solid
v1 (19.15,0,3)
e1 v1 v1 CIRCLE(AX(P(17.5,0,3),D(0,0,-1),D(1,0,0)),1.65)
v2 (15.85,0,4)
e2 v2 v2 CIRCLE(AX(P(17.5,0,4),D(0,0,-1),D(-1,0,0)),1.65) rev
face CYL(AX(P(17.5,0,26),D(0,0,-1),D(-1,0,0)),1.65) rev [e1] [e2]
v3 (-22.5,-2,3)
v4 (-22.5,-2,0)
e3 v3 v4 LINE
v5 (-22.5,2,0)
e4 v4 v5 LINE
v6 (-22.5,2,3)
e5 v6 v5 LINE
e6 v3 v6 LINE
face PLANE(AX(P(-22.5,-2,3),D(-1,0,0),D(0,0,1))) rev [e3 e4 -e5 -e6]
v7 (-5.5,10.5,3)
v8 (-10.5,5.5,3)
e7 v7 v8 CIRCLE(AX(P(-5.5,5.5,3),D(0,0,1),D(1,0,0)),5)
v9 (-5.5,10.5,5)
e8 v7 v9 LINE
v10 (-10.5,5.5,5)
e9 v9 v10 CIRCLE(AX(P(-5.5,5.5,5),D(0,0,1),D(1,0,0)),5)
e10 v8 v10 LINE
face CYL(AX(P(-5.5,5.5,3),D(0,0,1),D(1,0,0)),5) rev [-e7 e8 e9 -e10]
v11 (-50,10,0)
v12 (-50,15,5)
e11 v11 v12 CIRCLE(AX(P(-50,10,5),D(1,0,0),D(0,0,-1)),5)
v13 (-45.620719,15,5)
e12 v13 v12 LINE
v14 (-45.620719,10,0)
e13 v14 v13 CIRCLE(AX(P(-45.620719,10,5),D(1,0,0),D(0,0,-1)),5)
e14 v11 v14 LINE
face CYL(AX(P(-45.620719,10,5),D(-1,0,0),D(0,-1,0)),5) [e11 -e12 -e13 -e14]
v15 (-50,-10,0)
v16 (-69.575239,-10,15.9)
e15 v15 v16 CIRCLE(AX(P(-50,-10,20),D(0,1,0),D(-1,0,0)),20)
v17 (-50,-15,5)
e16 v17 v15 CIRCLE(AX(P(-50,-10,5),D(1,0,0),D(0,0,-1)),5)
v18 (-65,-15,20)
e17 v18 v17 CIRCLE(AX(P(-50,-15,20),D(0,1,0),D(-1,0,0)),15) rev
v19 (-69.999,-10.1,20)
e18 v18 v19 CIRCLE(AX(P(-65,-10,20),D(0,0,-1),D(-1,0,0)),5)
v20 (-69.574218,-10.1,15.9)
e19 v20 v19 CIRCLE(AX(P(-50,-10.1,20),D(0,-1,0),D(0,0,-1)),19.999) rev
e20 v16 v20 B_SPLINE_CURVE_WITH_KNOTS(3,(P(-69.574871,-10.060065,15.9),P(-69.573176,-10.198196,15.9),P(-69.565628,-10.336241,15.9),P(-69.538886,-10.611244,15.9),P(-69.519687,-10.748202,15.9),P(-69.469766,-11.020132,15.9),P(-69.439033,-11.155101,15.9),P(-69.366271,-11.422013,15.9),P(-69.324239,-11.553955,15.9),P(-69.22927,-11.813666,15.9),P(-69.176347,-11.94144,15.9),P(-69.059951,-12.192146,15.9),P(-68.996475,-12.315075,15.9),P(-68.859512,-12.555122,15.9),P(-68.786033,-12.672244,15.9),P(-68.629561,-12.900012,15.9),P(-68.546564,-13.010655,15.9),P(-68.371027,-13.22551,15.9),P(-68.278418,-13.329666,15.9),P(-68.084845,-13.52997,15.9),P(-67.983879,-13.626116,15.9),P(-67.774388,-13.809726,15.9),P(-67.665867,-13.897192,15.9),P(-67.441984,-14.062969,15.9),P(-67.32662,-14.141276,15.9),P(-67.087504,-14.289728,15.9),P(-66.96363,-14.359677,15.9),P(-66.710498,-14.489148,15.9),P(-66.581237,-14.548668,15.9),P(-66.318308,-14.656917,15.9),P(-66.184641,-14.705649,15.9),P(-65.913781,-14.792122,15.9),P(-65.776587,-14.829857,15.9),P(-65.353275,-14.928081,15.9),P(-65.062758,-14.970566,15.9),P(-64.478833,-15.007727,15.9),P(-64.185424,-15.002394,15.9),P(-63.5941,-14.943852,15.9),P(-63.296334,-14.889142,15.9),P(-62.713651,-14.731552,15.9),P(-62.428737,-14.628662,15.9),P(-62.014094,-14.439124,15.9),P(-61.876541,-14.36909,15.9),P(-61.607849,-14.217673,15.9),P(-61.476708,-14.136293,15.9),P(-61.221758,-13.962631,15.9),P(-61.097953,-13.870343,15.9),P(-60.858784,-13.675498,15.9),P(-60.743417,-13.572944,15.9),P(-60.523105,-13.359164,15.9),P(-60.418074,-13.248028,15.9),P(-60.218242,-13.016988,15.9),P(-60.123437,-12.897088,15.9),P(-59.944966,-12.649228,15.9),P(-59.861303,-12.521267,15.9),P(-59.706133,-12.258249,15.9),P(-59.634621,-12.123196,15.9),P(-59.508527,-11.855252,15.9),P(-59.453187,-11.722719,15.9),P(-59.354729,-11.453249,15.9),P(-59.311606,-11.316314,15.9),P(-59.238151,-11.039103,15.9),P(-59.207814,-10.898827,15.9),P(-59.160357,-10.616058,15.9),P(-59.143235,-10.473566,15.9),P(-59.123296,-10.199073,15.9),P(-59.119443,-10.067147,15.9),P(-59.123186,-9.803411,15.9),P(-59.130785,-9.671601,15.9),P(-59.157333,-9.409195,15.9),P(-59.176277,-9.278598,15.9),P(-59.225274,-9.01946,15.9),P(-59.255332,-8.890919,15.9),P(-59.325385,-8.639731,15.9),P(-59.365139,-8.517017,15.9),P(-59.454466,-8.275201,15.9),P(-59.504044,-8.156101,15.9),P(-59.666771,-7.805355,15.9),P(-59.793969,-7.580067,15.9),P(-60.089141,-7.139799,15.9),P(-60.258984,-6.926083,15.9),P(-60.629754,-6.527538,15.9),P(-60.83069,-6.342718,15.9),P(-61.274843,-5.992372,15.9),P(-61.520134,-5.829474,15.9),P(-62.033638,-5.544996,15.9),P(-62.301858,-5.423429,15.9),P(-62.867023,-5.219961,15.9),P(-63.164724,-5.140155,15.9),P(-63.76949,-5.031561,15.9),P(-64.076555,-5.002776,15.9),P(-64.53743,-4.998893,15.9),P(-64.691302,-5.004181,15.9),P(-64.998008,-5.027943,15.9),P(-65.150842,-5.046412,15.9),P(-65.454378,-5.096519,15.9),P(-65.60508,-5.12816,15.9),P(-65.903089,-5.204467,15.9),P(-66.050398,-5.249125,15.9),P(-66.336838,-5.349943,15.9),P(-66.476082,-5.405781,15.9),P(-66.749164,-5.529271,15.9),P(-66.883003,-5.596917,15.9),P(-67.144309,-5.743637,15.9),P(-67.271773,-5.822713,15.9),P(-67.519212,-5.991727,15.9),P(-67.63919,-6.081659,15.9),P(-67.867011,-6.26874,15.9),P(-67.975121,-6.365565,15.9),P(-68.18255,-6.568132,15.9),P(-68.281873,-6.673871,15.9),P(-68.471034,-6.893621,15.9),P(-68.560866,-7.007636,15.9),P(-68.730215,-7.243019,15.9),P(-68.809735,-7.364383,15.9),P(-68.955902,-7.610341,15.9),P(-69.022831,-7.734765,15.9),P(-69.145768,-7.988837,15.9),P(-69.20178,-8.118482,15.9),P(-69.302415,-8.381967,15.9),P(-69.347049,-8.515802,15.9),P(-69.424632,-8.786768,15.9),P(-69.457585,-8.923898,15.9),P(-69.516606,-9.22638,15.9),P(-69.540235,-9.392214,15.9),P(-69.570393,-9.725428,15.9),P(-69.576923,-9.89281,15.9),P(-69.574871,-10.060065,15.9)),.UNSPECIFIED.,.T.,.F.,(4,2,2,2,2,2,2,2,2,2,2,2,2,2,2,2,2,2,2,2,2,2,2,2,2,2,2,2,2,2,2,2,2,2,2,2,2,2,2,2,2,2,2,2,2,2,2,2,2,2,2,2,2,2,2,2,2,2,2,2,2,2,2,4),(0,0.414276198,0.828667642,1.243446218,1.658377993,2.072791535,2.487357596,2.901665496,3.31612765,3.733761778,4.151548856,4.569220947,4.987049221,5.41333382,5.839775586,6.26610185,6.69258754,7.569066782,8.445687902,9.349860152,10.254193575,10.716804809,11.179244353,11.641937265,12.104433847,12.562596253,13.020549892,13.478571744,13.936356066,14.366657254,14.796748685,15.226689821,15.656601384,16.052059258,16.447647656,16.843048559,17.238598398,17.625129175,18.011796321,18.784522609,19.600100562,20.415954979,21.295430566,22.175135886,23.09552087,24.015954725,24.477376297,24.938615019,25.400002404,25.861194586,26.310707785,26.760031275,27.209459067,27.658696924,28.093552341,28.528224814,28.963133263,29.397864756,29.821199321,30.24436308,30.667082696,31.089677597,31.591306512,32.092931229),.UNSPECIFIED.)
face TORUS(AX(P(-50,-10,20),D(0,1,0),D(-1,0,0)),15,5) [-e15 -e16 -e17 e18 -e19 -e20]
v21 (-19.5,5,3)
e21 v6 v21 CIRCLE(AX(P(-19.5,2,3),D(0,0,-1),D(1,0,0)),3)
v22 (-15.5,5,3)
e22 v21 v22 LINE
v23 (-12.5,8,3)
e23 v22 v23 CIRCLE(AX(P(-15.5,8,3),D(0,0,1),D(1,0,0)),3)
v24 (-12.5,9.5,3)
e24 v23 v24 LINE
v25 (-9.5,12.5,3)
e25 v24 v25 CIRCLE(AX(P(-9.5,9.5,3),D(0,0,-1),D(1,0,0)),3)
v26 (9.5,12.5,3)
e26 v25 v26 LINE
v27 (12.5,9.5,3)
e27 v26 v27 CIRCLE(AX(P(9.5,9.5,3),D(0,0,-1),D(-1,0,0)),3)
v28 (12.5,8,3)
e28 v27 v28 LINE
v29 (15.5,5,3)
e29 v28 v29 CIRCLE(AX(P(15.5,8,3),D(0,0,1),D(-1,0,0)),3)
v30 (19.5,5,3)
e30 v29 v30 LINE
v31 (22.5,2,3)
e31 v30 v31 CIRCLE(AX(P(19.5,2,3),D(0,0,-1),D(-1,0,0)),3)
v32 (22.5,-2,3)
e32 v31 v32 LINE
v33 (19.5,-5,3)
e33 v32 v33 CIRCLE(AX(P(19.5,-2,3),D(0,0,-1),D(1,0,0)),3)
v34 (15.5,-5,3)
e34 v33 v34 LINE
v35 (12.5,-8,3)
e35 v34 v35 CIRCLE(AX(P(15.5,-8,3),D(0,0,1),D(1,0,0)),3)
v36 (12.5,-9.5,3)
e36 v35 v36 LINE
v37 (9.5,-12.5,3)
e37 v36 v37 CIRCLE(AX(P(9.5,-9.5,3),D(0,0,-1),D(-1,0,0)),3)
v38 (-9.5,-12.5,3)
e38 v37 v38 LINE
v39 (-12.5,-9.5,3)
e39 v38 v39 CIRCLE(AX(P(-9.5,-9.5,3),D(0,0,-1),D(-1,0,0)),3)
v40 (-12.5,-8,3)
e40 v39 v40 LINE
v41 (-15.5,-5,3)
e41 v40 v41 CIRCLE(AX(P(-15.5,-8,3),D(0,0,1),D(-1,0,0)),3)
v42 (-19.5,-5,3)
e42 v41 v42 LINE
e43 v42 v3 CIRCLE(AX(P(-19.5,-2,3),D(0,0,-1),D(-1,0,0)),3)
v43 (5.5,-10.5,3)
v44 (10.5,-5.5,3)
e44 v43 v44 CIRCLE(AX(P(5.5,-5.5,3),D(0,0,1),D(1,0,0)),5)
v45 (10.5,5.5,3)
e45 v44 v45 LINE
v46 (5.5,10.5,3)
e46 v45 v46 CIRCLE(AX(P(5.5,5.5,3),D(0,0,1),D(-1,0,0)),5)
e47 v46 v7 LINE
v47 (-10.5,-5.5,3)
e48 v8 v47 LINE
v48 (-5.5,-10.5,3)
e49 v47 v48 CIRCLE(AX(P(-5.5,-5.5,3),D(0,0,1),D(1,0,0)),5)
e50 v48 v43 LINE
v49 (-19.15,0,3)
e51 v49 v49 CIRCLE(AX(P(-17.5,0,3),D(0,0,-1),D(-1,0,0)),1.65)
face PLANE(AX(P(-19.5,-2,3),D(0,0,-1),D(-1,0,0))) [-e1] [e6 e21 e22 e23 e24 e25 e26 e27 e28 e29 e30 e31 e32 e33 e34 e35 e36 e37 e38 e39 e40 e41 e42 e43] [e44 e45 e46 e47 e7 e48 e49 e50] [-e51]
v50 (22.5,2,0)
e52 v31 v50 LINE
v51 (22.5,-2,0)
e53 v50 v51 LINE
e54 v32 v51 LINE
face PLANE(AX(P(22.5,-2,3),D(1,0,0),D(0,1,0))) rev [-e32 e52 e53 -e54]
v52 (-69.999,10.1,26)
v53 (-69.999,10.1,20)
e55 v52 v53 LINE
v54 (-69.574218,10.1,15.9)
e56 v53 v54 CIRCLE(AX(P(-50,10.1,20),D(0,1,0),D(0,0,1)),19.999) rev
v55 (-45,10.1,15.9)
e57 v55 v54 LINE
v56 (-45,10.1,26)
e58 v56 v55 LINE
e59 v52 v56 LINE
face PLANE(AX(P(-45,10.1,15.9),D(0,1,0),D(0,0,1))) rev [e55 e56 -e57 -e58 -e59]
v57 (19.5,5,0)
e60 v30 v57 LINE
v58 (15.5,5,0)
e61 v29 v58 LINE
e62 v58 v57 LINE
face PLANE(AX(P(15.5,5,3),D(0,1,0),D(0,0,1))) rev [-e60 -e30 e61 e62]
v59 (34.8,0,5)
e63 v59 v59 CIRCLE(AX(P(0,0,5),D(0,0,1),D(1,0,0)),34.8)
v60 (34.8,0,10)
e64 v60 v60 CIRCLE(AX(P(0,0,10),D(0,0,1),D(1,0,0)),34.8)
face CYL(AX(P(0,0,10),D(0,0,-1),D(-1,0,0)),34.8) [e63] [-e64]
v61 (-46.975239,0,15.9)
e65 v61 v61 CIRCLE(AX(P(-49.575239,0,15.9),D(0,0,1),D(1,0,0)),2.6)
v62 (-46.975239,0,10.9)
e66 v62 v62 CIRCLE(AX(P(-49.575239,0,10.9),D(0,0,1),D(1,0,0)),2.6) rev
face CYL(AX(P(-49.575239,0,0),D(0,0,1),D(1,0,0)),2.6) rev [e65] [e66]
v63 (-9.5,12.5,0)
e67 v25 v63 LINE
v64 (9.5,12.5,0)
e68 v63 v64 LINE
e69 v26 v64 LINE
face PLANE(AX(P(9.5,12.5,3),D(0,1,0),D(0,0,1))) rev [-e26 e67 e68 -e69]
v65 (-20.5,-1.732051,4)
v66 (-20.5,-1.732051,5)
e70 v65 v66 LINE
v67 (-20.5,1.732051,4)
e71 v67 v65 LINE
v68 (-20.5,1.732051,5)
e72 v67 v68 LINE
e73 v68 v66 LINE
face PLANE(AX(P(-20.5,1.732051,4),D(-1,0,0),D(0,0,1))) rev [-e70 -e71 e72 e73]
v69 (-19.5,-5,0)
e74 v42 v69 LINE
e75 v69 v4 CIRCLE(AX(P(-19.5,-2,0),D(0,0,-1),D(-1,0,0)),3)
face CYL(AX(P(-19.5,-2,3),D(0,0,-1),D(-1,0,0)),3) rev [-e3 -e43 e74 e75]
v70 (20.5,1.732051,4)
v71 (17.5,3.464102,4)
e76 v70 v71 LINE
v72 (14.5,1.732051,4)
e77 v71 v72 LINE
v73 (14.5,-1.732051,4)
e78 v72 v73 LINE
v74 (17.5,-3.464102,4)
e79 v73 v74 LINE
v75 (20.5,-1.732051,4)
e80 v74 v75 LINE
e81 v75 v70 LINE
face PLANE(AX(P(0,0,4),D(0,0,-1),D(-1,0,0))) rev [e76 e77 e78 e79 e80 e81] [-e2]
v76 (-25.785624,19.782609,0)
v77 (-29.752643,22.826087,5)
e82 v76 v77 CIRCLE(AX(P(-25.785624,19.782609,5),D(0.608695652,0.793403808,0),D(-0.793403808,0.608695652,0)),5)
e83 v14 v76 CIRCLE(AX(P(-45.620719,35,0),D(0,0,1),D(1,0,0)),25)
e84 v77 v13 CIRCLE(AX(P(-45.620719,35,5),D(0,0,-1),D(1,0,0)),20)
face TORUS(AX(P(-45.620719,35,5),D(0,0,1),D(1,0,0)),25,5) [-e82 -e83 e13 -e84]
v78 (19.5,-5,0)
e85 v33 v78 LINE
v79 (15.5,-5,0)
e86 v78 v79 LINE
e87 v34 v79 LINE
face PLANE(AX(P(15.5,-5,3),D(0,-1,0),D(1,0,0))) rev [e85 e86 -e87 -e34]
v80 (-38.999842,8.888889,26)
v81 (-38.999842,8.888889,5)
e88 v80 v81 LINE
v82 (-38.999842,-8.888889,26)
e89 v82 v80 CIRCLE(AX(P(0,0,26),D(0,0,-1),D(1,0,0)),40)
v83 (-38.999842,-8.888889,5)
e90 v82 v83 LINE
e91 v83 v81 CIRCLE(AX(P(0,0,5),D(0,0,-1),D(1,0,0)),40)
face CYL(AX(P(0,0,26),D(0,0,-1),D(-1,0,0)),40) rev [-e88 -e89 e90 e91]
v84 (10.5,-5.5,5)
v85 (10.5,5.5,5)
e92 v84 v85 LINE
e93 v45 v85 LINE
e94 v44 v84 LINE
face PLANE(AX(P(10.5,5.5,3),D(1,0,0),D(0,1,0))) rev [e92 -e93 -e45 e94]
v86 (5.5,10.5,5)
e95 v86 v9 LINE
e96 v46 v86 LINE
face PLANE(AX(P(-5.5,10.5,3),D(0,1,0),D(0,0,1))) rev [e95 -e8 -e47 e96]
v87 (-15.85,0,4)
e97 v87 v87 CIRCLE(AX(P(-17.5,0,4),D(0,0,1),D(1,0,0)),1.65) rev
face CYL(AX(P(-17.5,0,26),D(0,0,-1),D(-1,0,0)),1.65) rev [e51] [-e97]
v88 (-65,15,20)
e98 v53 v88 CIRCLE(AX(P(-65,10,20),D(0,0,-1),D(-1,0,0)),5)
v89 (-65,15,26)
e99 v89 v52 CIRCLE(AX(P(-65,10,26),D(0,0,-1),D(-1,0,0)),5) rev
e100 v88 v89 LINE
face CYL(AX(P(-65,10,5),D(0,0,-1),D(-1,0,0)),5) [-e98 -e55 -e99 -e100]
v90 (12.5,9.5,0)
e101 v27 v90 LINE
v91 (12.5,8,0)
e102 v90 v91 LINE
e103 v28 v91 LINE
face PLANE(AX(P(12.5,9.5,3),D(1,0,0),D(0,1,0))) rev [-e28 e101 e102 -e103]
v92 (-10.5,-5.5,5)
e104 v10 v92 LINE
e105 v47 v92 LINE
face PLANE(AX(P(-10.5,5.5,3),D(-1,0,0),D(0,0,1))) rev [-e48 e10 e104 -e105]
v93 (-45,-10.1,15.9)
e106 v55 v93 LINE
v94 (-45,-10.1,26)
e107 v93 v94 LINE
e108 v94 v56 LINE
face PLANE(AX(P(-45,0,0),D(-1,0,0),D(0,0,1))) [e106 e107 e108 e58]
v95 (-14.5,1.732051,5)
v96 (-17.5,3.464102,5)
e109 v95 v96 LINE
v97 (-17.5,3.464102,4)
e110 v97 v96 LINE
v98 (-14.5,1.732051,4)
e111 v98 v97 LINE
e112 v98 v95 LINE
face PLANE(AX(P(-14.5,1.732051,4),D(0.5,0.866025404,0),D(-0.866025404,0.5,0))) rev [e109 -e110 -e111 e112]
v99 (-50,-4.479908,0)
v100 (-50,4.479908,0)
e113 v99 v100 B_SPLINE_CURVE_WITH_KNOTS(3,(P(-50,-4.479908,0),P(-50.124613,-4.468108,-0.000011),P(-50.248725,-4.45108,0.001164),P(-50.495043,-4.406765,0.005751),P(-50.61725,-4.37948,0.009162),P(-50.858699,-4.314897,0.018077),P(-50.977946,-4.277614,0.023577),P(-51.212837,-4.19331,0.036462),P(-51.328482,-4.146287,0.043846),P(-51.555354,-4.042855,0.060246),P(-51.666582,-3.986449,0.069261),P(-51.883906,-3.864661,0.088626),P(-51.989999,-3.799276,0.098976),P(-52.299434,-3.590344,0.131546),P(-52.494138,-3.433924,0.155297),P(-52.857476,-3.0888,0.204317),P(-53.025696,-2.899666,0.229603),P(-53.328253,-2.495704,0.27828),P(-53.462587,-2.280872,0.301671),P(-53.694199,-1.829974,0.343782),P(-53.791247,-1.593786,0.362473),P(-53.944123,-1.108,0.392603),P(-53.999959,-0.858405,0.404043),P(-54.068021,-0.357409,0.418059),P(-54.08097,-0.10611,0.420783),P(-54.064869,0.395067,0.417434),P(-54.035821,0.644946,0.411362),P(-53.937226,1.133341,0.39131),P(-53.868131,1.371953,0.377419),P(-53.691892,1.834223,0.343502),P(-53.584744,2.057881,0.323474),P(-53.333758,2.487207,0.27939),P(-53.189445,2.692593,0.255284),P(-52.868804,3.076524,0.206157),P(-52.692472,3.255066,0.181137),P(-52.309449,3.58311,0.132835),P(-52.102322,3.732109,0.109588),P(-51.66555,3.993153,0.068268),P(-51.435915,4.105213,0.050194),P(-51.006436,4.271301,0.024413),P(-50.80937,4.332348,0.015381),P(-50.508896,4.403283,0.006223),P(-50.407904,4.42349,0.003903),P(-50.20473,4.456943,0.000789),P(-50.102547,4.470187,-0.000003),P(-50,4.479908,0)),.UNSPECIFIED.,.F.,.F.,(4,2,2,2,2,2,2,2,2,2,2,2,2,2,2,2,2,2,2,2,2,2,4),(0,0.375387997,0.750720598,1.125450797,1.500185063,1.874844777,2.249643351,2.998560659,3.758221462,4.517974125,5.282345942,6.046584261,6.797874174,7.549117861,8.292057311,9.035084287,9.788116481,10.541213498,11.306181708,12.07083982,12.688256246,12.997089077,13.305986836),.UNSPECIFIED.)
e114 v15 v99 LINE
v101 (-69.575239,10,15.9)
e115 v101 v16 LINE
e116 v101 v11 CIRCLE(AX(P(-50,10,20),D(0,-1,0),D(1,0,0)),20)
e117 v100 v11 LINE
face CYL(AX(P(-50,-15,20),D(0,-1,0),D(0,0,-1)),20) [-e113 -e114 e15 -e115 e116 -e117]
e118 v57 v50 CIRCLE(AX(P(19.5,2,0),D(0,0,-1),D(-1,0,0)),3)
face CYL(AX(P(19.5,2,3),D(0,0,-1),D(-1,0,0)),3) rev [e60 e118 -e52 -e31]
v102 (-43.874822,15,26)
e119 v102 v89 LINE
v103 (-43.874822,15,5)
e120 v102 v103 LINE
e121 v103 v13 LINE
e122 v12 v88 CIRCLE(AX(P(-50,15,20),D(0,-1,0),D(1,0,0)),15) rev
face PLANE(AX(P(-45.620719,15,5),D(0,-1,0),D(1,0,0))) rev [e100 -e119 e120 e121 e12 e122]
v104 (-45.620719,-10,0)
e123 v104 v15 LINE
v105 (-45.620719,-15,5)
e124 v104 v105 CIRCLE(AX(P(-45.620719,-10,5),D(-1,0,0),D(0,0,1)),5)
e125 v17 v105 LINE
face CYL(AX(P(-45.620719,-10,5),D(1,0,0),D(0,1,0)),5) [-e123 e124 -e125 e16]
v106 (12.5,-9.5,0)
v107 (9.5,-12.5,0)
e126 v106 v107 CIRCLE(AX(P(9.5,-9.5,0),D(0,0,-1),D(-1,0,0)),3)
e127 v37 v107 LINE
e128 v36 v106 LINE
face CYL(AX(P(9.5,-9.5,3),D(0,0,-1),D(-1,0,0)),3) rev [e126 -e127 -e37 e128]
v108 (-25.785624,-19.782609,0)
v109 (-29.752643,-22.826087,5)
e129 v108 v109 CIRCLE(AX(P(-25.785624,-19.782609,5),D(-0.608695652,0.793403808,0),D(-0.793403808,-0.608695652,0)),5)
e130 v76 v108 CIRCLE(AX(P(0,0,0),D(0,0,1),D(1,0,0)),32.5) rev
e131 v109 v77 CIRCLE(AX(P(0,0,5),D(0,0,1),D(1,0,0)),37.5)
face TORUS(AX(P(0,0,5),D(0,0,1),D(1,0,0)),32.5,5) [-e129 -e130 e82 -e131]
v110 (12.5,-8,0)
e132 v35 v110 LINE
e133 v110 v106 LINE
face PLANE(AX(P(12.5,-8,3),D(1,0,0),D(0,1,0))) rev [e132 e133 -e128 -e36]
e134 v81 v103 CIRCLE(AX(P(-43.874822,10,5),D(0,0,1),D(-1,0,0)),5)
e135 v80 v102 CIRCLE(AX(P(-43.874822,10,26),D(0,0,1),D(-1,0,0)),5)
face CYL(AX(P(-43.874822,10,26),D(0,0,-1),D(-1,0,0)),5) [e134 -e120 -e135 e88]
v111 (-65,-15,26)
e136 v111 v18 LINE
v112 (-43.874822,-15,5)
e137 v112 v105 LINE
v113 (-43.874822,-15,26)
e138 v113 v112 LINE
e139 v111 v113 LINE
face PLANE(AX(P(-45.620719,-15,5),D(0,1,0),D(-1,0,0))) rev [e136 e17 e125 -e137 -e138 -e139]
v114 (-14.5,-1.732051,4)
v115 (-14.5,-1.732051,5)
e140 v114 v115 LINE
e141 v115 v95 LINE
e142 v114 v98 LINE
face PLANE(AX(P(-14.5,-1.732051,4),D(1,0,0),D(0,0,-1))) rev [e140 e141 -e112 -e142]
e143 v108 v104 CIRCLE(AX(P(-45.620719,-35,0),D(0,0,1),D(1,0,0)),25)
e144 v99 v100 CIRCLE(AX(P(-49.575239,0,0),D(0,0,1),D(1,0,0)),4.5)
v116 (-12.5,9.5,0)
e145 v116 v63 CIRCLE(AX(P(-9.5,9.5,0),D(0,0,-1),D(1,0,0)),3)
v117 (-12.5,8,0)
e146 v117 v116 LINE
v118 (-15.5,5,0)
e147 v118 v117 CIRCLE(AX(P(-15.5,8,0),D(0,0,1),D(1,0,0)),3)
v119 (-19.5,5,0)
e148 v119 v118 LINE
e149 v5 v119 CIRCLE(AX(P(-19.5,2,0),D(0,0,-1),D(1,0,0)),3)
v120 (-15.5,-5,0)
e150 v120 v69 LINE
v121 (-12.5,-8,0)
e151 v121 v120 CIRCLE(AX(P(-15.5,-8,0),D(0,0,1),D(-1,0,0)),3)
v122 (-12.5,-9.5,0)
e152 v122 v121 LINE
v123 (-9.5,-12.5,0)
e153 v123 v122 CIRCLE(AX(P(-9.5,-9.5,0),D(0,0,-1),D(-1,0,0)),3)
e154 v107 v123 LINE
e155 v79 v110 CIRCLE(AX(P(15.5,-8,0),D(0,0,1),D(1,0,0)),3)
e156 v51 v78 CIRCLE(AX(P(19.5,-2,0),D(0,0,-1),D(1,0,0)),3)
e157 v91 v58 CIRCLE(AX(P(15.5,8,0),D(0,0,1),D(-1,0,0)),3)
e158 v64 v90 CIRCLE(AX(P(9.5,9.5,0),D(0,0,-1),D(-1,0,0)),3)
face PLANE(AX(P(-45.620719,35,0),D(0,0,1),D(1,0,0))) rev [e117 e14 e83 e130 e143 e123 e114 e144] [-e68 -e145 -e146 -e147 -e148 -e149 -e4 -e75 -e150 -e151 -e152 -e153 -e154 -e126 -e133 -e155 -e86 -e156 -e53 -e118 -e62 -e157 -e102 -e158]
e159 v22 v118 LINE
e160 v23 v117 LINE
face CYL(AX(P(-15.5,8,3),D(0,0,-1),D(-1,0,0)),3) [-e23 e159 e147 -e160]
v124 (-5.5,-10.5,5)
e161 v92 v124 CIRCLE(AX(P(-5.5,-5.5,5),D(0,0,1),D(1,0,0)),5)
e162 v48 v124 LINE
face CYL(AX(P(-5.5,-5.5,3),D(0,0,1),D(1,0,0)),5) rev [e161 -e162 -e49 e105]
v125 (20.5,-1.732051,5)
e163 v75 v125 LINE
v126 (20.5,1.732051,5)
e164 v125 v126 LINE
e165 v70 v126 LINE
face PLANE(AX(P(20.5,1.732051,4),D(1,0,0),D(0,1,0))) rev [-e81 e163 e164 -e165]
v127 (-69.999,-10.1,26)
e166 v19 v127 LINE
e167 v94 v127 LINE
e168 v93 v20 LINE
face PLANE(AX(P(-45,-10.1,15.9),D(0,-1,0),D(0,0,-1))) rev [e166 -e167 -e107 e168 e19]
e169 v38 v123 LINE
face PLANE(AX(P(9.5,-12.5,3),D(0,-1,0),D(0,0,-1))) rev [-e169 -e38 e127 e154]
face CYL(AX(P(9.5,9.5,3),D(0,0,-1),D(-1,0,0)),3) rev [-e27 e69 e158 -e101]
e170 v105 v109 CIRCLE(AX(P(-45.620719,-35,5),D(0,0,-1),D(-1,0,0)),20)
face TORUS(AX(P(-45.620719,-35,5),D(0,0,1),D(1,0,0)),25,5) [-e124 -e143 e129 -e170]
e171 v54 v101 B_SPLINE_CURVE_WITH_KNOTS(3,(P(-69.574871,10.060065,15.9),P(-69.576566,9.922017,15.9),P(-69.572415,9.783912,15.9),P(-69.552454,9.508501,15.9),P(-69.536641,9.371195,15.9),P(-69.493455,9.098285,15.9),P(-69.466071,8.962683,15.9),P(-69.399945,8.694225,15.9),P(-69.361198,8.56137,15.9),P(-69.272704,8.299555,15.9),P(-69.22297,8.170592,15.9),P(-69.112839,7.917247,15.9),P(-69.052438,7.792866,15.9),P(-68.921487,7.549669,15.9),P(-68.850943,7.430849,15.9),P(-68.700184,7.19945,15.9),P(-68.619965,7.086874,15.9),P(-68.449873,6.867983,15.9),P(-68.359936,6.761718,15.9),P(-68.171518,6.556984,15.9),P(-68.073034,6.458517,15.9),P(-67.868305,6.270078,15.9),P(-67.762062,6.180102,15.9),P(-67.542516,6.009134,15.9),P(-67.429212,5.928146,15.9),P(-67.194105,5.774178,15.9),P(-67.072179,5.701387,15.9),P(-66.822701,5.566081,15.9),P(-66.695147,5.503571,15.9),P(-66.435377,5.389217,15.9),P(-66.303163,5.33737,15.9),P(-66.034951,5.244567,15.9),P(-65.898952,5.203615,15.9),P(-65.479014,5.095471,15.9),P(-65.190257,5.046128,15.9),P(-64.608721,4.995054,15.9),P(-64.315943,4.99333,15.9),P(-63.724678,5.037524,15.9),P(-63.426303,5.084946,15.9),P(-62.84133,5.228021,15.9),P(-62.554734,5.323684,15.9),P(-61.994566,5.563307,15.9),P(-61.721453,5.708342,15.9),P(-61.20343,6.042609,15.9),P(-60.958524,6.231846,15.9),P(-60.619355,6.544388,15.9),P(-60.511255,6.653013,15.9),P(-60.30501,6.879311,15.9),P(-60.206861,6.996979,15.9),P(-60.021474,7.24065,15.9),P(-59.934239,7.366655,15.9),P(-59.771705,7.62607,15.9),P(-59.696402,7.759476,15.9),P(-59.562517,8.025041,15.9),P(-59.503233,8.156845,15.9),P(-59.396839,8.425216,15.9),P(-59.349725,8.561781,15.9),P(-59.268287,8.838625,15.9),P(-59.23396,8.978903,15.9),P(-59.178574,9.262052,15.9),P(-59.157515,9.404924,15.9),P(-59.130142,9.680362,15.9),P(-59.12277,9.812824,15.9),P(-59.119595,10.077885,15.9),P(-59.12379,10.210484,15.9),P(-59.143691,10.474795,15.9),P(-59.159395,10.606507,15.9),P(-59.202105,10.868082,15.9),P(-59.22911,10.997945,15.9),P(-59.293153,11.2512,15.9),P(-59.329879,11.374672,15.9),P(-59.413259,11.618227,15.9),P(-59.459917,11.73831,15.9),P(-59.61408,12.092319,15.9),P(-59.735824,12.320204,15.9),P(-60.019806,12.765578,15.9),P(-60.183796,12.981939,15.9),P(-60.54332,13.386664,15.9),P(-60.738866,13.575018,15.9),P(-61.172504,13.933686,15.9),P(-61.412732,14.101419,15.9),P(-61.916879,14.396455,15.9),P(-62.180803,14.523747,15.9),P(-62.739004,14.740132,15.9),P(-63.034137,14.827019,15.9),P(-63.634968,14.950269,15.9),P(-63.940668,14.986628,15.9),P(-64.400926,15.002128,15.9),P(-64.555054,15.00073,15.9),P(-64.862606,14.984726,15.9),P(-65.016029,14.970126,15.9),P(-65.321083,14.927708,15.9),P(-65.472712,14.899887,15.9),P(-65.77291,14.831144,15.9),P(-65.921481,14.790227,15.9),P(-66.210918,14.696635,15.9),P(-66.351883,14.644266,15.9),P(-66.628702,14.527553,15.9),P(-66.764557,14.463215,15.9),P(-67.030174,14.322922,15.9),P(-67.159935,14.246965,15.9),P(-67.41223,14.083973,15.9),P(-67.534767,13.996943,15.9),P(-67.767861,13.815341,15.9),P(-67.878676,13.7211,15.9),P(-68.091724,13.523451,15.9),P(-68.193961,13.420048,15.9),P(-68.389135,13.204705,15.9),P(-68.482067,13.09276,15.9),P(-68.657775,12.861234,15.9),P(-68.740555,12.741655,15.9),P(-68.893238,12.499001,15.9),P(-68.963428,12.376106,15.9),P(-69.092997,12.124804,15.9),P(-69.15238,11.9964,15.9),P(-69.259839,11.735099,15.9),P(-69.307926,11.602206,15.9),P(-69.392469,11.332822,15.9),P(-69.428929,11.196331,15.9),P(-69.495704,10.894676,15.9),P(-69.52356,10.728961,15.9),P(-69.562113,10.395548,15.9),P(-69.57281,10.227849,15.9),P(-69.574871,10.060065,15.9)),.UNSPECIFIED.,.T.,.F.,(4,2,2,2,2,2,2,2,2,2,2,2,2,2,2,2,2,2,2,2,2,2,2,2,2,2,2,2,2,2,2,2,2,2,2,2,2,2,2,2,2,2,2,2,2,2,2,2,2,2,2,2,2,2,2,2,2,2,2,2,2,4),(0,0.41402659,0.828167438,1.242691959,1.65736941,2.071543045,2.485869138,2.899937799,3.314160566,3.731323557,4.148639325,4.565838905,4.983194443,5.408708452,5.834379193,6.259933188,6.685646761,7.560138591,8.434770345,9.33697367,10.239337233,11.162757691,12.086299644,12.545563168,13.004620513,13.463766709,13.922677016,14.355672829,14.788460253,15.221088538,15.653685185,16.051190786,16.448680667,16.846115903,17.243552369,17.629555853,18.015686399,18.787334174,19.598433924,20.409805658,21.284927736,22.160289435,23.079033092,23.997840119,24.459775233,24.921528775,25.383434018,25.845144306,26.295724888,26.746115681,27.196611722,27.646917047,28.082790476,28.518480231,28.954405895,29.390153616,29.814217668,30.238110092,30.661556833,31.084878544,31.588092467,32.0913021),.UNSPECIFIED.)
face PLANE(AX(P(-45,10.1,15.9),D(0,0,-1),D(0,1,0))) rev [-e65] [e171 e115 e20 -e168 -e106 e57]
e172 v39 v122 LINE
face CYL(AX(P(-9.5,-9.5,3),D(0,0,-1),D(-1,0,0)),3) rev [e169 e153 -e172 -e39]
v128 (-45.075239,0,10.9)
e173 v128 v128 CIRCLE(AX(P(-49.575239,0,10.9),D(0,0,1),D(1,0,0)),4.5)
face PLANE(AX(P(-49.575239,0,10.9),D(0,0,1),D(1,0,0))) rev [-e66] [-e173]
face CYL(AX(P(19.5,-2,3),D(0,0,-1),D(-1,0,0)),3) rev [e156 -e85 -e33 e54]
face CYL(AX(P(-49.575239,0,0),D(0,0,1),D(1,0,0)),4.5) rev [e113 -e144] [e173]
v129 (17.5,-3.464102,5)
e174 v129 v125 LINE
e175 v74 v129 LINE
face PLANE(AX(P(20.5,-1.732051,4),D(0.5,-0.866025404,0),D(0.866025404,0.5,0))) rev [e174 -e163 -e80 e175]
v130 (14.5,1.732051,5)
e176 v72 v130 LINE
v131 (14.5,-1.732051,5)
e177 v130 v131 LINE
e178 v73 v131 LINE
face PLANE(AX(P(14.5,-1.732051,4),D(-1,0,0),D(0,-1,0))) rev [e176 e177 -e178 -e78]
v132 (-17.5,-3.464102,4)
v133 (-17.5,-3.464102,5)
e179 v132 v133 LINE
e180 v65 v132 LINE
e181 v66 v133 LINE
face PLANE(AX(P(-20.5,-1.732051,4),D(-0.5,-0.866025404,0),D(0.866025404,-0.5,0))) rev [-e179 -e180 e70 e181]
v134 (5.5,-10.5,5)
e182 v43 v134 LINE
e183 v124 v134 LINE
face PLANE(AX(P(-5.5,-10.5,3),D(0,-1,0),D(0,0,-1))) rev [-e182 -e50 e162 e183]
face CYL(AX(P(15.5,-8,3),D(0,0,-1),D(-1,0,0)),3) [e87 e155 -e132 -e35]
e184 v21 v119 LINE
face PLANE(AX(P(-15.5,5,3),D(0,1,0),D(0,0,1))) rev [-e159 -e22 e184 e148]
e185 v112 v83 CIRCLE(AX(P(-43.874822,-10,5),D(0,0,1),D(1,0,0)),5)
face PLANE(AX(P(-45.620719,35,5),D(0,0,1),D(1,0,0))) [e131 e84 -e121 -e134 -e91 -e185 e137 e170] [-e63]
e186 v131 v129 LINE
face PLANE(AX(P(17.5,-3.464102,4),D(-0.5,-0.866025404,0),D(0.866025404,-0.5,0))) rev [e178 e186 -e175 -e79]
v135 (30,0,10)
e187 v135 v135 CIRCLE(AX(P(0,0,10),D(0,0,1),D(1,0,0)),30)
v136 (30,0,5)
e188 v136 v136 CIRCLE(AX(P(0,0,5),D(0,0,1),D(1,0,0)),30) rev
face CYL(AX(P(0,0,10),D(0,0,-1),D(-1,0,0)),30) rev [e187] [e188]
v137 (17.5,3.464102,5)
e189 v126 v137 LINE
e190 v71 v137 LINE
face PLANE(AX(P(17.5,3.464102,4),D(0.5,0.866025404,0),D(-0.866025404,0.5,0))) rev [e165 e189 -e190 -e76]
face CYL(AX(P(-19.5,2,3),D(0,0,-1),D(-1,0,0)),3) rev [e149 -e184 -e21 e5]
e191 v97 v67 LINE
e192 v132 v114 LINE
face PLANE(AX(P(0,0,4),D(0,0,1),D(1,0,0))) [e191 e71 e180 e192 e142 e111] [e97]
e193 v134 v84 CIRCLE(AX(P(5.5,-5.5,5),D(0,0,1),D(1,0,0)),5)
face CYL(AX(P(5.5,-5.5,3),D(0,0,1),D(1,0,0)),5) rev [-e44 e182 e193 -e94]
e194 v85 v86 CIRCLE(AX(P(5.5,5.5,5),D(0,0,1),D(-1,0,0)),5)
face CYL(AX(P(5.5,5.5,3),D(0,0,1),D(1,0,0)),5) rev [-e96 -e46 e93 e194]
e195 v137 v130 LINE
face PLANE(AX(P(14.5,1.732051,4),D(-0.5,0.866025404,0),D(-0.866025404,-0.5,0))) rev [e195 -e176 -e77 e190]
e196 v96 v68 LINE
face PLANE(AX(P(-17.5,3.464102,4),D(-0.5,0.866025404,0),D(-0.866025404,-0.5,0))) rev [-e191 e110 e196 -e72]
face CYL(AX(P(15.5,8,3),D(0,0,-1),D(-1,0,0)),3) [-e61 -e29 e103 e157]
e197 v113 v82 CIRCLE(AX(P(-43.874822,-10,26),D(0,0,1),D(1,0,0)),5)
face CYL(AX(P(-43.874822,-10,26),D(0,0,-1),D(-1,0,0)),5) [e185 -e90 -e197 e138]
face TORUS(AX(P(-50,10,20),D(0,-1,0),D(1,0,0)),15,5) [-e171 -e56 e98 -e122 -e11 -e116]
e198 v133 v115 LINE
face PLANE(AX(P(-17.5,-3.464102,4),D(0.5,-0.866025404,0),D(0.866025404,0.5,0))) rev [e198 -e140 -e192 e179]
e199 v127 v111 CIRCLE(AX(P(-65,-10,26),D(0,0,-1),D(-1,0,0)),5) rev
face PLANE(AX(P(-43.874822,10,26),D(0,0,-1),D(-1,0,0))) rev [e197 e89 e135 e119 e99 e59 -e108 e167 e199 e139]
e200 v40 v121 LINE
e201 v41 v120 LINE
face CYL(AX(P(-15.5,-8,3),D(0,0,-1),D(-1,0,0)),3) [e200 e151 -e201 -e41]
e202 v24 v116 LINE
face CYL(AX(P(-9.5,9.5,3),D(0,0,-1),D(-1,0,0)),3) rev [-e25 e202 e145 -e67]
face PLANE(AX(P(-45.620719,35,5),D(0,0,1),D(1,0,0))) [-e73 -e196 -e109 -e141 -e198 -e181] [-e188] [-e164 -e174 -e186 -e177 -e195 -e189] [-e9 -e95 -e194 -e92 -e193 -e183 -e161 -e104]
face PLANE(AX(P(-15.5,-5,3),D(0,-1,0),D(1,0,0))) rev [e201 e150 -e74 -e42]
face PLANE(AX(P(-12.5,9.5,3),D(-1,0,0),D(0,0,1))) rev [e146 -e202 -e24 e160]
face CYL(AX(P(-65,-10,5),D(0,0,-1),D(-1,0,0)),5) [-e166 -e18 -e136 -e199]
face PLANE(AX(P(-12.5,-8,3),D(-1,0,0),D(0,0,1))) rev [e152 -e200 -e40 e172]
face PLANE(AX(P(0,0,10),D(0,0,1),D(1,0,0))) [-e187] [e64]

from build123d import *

# Parameters (mm, degrees)
BOSS_EXTRU_1_DEPTH      = 5
ESQUISSE6_R             = 34.8
ESQUISSE6_R_2           = 30
BOSS_EXTRU_6_DEPTH      = 5
BOSS_EXTRU_9_DEPTH      = 21
CONG_1_R                = 20
CONG_2_R                = 5
ESQUISSE11_W            = 20.2
ESQUISSE11_H            = 20.2
ENL_V_MAT_EXTRU_2_DEPTH = 25
ESQUISSE12_R            = 2.6
ENL_V_MAT_EXTRU_3_DEPTH = 81.987161213
ENL_V_START             = -5
ESQUISSE13_R            = 4.5
ENL_V_MAT_EXTRU_4_DEPTH = 76.987161213
ENL_V_MAT_EXTRU_5_DEPTH = 2
ENL_V_MAT_EXTRU_7_DEPTH = 3
ESQUISSE19_R            = 1.65
ENL_V_MAT_EXTRU_8_DEPTH = 83.674725752
ENL_V_MAT_EXTRU_9_DEPTH = 1


with BuildPart() as part:
    # Esquisse1 → Boss.-Extru.1 (new body)
    with BuildSketch(Plane.XY):
        with BuildLine():
            Line((-45.620718977, 15), (-70, 15))
            Line((-70, 15), (-70, -15))
            Line((-70, -15), (-45.620718977, -15))
            ThreePointArc((-45.620718977, -15), (-36.774201608, -17.062911874), (-29.752642811, -22.826086957))
            ThreePointArc((-29.752642811, -22.826086957), (37.5, 0), (-29.752642811, 22.826086957))
            ThreePointArc((-29.752642811, 22.826086957), (-36.774201608, 17.062911874), (-45.620718977, 15))
        make_face()
    extrude(amount=BOSS_EXTRU_1_DEPTH)

    # Esquisse6 → Boss.-Extru.6 (add)
    with BuildSketch(Plane.XY.offset(5)):
        Circle(ESQUISSE6_R)
        Circle(ESQUISSE6_R_2, mode=Mode.SUBTRACT)
    extrude(amount=BOSS_EXTRU_6_DEPTH)

    # Esquisse8 → Boss.-Extru.9 (add)
    with BuildSketch(Plane.XY.offset(5)):
        with BuildLine():
            Line((-70, -15), (-70, 15))
            Line((-70, 15), (-43.874821937, 15))
            ThreePointArc((-43.874821937, 15), (-39.966142137, 13.118047822), (-38.999841722, 8.888888889))
            ThreePointArc((-38.999841722, 8.888888889), (-40, 0), (-38.999841722, -8.888888889))
            ThreePointArc((-38.999841722, -8.888888889), (-39.966142137, -13.118047822), (-43.874821937, -15))
            Line((-43.874821937, -15), (-70, -15))
        make_face()
    extrude(amount=BOSS_EXTRU_9_DEPTH)

    # Congé1
    cong_1_edges = [part.edges().sort_by_distance(p)[0] for p in [
        (-70, 0, 0),
    ]]
    fillet(cong_1_edges, radius=CONG_1_R)

    # Congé2
    cong_2_edges = [part.edges().sort_by_distance(p)[0] for p in [
        (-47.810359489, -15, 0),
        (-36.774201608, -17.062911874, 0),
        (37.5, 0, 0),
        (-36.774201608, 17.062911874, 0),
        (-47.810359489, 15, 0),
        (-64.142135624, 15, 5.857864376),
        (-64.142135624, -15, 5.857864376),
        (-70, -15, 23),
        (-70, 15, 23),
    ]]
    fillet(cong_2_edges, radius=CONG_2_R - 0.0001)  # a hair under: the kernel refuses the full size

    # Esquisse11 → Enlèv. mat.-Extru.2 (cut)
    with BuildSketch(Plane.ZY.offset(70)):
        with Locations((26, 0)):
            Rectangle(ESQUISSE11_W, ESQUISSE11_H)
    extrude(amount=-ENL_V_MAT_EXTRU_2_DEPTH, mode=Mode.SUBTRACT)

    # Esquisse12 → Enlèv. mat.-Extru.3 (cut, through all)
    with BuildSketch(Plane.XY.offset(15.9)):
        with Locations((-49.575239462, 0)):
            Circle(ESQUISSE12_R)
    extrude(amount=-ENL_V_MAT_EXTRU_3_DEPTH, mode=Mode.SUBTRACT)

    # Esquisse13 → Enlèv. mat.-Extru.4 (cut, through all)
    with BuildSketch(Plane.XY.offset(15.9).offset(ENL_V_START)):
        with Locations((-49.575239462, 0)):
            Circle(ESQUISSE13_R)
    extrude(amount=-ENL_V_MAT_EXTRU_4_DEPTH, mode=Mode.SUBTRACT)

    # Esquisse14 → Enlèv. mat.-Extru.5 (cut)
    with BuildSketch(Plane.XY.offset(5)):
        with BuildLine():
            Line((-5.5, 10.5), (5.5, 10.5))
            ThreePointArc((5.5, 10.5), (9.035533906, 9.035533906), (10.5, 5.5))
            Line((10.5, 5.5), (10.5, -5.5))
            ThreePointArc((10.5, -5.5), (9.035533906, -9.035533906), (5.5, -10.5))
            Line((5.5, -10.5), (-5.5, -10.5))
            ThreePointArc((-5.5, -10.5), (-9.035533906, -9.035533906), (-10.5, -5.5))
            Line((-10.5, -5.5), (-10.5, 5.5))
            ThreePointArc((-10.5, 5.5), (-9.035533906, 9.035533906), (-5.5, 10.5))
        make_face()
    extrude(amount=-ENL_V_MAT_EXTRU_5_DEPTH, mode=Mode.SUBTRACT)

    # Esquisse17 → Enlèv. mat.-Extru.7 (cut)
    with BuildSketch(Plane(origin=(0, 0, 0), x_dir=(-1, 0, 0), z_dir=(0, 0, -1))):
        with BuildLine():
            Line((15.5, 5), (19.5, 5))
            ThreePointArc((19.5, 5), (21.621320344, 4.121320344), (22.5, 2))
            Line((22.5, 2), (22.5, -2))
            ThreePointArc((22.5, -2), (21.621320344, -4.121320344), (19.5, -5))
            Line((19.5, -5), (15.5, -5))
            ThreePointArc((15.5, -5), (13.378679656, -5.878679656), (12.5, -8))
            Line((12.5, -8), (12.5, -9.5))
            ThreePointArc((12.5, -9.5), (11.621320344, -11.621320344), (9.5, -12.5))
            Line((9.5, -12.5), (-9.5, -12.5))
            ThreePointArc((-9.5, -12.5), (-11.621320344, -11.621320344), (-12.5, -9.5))
            Line((-12.5, -9.5), (-12.5, -8))
            ThreePointArc((-12.5, -8), (-13.378679656, -5.878679656), (-15.5, -5))
            Line((-15.5, -5), (-19.5, -5))
            ThreePointArc((-19.5, -5), (-21.621320344, -4.121320344), (-22.5, -2))
            Line((-22.5, -2), (-22.5, 2))
            ThreePointArc((-22.5, 2), (-21.621320344, 4.121320344), (-19.5, 5))
            Line((-19.5, 5), (-15.5, 5))
            ThreePointArc((-15.5, 5), (-13.378679656, 5.878679656), (-12.5, 8))
            Line((-12.5, 8), (-12.5, 9.5))
            ThreePointArc((-12.5, 9.5), (-11.621320344, 11.621320344), (-9.5, 12.5))
            Line((-9.5, 12.5), (9.5, 12.5))
            ThreePointArc((9.5, 12.5), (11.621320344, 11.621320344), (12.5, 9.5))
            Line((12.5, 9.5), (12.5, 8))
            ThreePointArc((12.5, 8), (13.378679656, 5.878679656), (15.5, 5))
        make_face()
    extrude(amount=-ENL_V_MAT_EXTRU_7_DEPTH, mode=Mode.SUBTRACT)

    # Esquisse19 → Enlèv. mat.-Extru.8 (cut, through all)
    with BuildSketch(Plane(origin=(0, 0, 3), x_dir=(-1, 0, 0), z_dir=(0, 0, -1))):
        with Locations((17.5, 0)):
            Circle(ESQUISSE19_R)
        with Locations(Location((-17.5, 0, 0), (0, 0, 180))):
            Circle(ESQUISSE19_R)
    extrude(amount=-ENL_V_MAT_EXTRU_8_DEPTH, mode=Mode.SUBTRACT)

    # Esquisse20 → Enlèv. mat.-Extru.9 (cut)
    with BuildSketch(Plane.XY.offset(5)):
        Polygon((-17.5, -3.464101615), (-14.5, -1.732050808), (-14.5, 1.732050808), (-17.5, 3.464101615), (-20.5, 1.732050808), (-20.5, -1.732050808), align=None)
        Polygon((20.5, -1.732050808), (17.5, -3.464101615), (14.5, -1.732050808), (14.5, 1.732050808), (17.5, 3.464101615), (20.5, 1.732050808), align=None)
    extrude(amount=-ENL_V_MAT_EXTRU_9_DEPTH, mode=Mode.SUBTRACT)


solid = part.part
